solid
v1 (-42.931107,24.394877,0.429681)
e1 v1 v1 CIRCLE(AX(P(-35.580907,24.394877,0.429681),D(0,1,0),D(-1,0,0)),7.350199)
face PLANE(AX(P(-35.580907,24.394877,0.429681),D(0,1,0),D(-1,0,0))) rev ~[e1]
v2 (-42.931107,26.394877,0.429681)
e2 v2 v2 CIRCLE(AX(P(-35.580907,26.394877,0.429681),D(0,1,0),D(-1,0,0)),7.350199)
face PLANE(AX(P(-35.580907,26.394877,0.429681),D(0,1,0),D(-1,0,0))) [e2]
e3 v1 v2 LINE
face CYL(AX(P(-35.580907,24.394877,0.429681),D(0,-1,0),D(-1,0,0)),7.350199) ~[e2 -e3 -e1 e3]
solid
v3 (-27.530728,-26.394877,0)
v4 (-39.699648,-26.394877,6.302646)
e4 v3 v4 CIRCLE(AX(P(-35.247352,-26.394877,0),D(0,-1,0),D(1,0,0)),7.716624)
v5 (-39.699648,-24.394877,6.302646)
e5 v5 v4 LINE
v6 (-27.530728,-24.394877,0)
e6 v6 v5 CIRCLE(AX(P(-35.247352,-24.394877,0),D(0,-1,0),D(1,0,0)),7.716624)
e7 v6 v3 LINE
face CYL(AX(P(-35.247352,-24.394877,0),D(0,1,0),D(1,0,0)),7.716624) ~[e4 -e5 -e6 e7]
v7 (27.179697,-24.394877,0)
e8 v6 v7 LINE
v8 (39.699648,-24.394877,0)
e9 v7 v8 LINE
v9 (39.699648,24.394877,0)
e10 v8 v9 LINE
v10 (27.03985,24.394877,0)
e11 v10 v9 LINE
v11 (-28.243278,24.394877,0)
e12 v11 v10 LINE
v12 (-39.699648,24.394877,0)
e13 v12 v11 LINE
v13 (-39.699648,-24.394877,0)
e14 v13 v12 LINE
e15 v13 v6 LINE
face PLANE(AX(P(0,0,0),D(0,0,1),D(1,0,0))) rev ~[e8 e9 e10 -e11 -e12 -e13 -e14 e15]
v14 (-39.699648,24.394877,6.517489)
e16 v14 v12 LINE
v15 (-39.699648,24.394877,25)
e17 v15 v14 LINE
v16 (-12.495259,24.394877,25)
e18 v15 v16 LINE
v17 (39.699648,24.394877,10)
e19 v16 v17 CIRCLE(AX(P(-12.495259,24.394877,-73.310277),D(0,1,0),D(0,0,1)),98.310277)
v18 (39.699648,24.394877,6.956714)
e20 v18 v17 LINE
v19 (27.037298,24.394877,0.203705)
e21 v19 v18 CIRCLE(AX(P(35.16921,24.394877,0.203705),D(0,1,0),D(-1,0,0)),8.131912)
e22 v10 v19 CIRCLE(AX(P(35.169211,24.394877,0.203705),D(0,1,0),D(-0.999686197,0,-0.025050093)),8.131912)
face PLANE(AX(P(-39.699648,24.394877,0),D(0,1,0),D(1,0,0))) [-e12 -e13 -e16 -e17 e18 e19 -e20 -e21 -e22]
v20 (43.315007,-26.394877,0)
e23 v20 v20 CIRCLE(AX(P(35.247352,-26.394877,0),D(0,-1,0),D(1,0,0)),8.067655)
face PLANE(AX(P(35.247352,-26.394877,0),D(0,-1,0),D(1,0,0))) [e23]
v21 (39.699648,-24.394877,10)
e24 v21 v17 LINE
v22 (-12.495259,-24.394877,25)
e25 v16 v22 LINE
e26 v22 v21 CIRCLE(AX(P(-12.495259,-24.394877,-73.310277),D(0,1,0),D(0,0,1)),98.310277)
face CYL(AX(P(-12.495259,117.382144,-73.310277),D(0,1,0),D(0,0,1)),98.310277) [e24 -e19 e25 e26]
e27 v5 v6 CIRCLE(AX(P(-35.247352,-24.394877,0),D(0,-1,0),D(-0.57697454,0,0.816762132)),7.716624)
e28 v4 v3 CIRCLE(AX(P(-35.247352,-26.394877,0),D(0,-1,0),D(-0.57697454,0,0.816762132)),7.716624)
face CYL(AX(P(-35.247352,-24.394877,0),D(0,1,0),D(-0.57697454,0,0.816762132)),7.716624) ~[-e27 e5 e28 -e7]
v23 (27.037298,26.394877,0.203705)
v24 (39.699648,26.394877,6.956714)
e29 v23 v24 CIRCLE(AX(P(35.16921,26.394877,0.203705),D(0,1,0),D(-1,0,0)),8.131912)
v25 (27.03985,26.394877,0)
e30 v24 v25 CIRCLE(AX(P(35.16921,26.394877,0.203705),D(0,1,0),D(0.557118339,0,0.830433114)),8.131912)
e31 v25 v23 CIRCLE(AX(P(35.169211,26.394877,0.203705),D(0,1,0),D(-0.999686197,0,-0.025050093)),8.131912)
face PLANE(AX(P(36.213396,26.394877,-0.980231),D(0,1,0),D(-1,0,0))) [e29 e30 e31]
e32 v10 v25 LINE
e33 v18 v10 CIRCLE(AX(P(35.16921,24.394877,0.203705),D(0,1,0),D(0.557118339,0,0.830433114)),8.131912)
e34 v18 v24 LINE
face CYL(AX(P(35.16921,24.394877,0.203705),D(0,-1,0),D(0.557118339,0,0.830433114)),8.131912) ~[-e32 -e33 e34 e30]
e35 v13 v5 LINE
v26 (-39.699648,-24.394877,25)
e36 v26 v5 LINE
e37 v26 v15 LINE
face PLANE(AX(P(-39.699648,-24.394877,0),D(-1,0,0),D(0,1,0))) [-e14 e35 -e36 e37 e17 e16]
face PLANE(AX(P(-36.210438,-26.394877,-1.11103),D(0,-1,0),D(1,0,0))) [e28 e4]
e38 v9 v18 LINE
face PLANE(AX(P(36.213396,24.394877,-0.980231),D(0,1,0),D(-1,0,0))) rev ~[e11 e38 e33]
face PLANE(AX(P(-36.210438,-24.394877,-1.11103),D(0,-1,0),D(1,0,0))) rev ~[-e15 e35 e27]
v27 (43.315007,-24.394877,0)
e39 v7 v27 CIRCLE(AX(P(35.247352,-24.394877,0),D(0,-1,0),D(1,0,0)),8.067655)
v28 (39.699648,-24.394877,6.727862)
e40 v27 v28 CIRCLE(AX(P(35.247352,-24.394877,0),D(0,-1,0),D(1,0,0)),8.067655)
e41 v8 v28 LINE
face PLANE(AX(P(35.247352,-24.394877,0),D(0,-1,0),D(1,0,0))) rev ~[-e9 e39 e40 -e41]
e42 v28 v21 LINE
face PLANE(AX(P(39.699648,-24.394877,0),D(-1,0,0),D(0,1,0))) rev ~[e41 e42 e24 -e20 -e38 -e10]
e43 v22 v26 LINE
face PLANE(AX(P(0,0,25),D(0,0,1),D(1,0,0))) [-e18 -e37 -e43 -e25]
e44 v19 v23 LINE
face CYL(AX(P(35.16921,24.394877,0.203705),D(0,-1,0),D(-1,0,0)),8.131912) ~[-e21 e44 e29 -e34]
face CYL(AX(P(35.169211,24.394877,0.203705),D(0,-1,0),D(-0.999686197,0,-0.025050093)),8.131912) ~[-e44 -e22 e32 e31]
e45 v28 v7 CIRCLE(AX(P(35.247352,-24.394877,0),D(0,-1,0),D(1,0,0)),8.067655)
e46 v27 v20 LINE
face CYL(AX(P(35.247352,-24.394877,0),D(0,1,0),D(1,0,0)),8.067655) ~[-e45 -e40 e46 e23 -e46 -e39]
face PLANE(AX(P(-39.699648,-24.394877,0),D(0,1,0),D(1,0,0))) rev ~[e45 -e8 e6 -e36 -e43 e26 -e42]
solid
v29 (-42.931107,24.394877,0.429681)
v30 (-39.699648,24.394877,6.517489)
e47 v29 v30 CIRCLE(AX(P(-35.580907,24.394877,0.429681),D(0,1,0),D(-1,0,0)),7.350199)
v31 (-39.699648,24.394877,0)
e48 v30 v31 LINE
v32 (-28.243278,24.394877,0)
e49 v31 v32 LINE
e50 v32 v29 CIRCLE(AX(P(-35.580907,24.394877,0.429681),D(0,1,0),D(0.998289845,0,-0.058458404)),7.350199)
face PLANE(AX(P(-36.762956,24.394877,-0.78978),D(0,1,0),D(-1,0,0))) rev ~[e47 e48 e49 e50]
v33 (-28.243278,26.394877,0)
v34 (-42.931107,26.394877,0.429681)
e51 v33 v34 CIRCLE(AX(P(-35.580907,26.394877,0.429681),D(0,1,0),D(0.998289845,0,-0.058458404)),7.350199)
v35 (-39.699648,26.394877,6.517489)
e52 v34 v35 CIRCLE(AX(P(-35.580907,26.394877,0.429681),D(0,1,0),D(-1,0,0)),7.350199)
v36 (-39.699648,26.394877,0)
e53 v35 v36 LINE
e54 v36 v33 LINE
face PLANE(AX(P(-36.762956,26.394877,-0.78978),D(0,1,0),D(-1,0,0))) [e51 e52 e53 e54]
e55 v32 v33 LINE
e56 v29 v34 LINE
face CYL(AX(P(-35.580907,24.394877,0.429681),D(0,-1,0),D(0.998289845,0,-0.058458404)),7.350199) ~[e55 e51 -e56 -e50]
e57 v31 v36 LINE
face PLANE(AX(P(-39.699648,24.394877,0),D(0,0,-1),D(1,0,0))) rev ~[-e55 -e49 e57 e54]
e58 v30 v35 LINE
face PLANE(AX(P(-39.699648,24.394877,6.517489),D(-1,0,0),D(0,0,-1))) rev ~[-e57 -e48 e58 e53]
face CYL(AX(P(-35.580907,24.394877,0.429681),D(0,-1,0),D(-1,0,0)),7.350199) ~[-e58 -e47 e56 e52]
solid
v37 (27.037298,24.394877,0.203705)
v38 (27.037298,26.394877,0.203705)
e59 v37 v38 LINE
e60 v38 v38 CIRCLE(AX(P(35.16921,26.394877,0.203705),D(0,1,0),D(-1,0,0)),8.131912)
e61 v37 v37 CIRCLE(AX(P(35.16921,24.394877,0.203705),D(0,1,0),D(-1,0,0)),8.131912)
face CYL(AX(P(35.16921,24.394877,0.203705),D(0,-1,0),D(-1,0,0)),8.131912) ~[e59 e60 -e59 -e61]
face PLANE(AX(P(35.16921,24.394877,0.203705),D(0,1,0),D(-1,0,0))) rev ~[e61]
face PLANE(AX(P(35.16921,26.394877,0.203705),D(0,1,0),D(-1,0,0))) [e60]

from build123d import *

# Parameters (mm, degrees)
F0_W         = 79.3992951512
F0_H         = 48.7897545099
F1_DEPTH     = 20
F3_DEPTH     = 2
F2_R         = 7.716624038
F2_R_2       = 8.0676554741
F4_DEPTH     = 2
F5_DEPTH     = 25
F7_DEPTH     = 2
F6_R         = 8.1319120556
F8_DEPTH     = 2
F6_R_2       = 7.3501994426
F9_SIZE      = 15
F10_T1_DEPTH = 234.764288605


# Not quite as in the source:
# - a fillet or chamfer that OpenCascade refuses, or shapes differently, is made with other operations: its cross-section is extruded or revolved along the edge and cut away or added


with BuildPart() as f1:
    # F0 (on Top) → F1 (new body)
    with BuildSketch(Plane.XY):
        Rectangle(F0_W, F0_H)
    extrude(amount=F1_DEPTH)

    # F2 (on face) → F3 (join)
    with BuildSketch(Plane.XZ.offset(24.394877255)):
        with BuildLine():
            ThreePointArc((-39.6996475756, 6.3026463031), (-38.7962669692, -6.8521156516), (-27.5307279362, 0))
            Line((-27.5307279362, 0), (-39.6996475756, 0))
            Line((-39.6996475756, 0), (-39.6996475756, 6.3026463031))
        make_face()
        with BuildLine():
            Line((-39.6996475756, 0), (-27.5307279362, 0))
            ThreePointArc((-27.5307279362, 0), (-31.6984369793, 6.8521156516), (-39.6996475756, 6.3026463031))
            Line((-39.6996475756, 6.3026463031), (-39.6996475756, 0))
        make_face()
    extrude(amount=F3_DEPTH)

    # F2 (on face) → F4 (join)
    with BuildSketch(Plane.XZ.offset(24.394877255)):
        with Locations((-35.2473519742, 0)):
            Circle(F2_R)
        with Locations((35.2473519742, 0)):
            Circle(F2_R_2)
    extrude(amount=F4_DEPTH)

    # F5 (add): a face of the model
    f5_faces = [f1.faces().sort_by_distance(p)[0] for p in [
        (0, 0, 0),
    ]]
    extrude(f5_faces, amount=-F5_DEPTH)

    # F6 (on face) → F7 (join)
    with BuildSketch(Plane(origin=(0, 24.394877255, 0), x_dir=(-1, 0, 0), z_dir=(0, 1, 0))):
        with BuildLine():
            Line((-39.6996475756, 0), (-39.6996475756, 6.9567142054))
            ThreePointArc((-39.6996475756, 6.9567142054), (-39.085462227, -6.9230727989), (-27.0398499989, 0))
            Line((-27.0398499989, 0), (-39.6996475756, 0))
        make_face()
        with BuildLine():
            ThreePointArc((-27.0398499989, 0), (-27.0379361612, 0.1018445872), (-27.0372981819, 0.2037051572))
            ThreePointArc((-27.0372981819, 0.2037051572), (-31.3425357234, 7.3789790783), (-39.6996475756, 6.9567142054))
            Line((-39.6996475756, 6.9567142054), (-39.6996475756, 0))
            Line((-39.6996475756, 0), (-27.0398499989, 0))
        make_face()
        with BuildLine():
            Line((39.6996475756, 0), (28.2432777683, 0))
            ThreePointArc((28.2432777683, 0), (35.7958396069, -6.9173753491), (42.9311066746, 0.4296809267))
            ThreePointArc((42.9311066746, 0.4296809267), (42.0731716607, 3.875828694), (39.6996475756, 6.517489221))
            Line((39.6996475756, 6.517489221), (39.6996475756, 0))
        make_face()
    extrude(amount=F7_DEPTH)

    # F9
    f9_edges = [f1.edges().sort_by_distance(p)[0] for p in [
        (39.699648, 0, 25),
    ]]
    chamfer(f9_edges, length=F9_SIZE)

    # F10: fillet of radius 98.3102765948 on 1 edges, made by hand

    # F10_s2 → F10_t1 (cut)
    with BuildSketch(Plane.XZ.offset(-117.3821443025)):
        with BuildLine():
            ThreePointArc((-12.4952592434, 25), (14.6585079807, 21.1756134083), (39.6996475756, 10))
            Line((39.6996475756, 10), (24.6996475756, 25))
            Line((24.6996475756, 25), (-12.4952592434, 25))
        make_face()
    extrude(amount=F10_T1_DEPTH, mode=Mode.SUBTRACT)


with BuildPart() as f8:
    # F6 (on face) → F8 (new body)
    with BuildSketch(Plane(origin=(0, 24.394877255, 0), x_dir=(-1, 0, 0), z_dir=(0, 1, 0))):
        with Locations((-35.1692102375, 0.2037051572)):
            Circle(F6_R)
    extrude(amount=F8_DEPTH)


with BuildPart() as f8b:
    # F6 (on face) → F8, piece 2 (new body)
    with BuildSketch(Plane(origin=(0, 24.394877255, 0), x_dir=(-1, 0, 0), z_dir=(0, 1, 0))):
        with Locations((35.580907232, 0.4296809267)):
            Circle(F6_R_2)
    extrude(amount=F8_DEPTH)


solid = Compound([f1.part, f8.part, f8b.part])
